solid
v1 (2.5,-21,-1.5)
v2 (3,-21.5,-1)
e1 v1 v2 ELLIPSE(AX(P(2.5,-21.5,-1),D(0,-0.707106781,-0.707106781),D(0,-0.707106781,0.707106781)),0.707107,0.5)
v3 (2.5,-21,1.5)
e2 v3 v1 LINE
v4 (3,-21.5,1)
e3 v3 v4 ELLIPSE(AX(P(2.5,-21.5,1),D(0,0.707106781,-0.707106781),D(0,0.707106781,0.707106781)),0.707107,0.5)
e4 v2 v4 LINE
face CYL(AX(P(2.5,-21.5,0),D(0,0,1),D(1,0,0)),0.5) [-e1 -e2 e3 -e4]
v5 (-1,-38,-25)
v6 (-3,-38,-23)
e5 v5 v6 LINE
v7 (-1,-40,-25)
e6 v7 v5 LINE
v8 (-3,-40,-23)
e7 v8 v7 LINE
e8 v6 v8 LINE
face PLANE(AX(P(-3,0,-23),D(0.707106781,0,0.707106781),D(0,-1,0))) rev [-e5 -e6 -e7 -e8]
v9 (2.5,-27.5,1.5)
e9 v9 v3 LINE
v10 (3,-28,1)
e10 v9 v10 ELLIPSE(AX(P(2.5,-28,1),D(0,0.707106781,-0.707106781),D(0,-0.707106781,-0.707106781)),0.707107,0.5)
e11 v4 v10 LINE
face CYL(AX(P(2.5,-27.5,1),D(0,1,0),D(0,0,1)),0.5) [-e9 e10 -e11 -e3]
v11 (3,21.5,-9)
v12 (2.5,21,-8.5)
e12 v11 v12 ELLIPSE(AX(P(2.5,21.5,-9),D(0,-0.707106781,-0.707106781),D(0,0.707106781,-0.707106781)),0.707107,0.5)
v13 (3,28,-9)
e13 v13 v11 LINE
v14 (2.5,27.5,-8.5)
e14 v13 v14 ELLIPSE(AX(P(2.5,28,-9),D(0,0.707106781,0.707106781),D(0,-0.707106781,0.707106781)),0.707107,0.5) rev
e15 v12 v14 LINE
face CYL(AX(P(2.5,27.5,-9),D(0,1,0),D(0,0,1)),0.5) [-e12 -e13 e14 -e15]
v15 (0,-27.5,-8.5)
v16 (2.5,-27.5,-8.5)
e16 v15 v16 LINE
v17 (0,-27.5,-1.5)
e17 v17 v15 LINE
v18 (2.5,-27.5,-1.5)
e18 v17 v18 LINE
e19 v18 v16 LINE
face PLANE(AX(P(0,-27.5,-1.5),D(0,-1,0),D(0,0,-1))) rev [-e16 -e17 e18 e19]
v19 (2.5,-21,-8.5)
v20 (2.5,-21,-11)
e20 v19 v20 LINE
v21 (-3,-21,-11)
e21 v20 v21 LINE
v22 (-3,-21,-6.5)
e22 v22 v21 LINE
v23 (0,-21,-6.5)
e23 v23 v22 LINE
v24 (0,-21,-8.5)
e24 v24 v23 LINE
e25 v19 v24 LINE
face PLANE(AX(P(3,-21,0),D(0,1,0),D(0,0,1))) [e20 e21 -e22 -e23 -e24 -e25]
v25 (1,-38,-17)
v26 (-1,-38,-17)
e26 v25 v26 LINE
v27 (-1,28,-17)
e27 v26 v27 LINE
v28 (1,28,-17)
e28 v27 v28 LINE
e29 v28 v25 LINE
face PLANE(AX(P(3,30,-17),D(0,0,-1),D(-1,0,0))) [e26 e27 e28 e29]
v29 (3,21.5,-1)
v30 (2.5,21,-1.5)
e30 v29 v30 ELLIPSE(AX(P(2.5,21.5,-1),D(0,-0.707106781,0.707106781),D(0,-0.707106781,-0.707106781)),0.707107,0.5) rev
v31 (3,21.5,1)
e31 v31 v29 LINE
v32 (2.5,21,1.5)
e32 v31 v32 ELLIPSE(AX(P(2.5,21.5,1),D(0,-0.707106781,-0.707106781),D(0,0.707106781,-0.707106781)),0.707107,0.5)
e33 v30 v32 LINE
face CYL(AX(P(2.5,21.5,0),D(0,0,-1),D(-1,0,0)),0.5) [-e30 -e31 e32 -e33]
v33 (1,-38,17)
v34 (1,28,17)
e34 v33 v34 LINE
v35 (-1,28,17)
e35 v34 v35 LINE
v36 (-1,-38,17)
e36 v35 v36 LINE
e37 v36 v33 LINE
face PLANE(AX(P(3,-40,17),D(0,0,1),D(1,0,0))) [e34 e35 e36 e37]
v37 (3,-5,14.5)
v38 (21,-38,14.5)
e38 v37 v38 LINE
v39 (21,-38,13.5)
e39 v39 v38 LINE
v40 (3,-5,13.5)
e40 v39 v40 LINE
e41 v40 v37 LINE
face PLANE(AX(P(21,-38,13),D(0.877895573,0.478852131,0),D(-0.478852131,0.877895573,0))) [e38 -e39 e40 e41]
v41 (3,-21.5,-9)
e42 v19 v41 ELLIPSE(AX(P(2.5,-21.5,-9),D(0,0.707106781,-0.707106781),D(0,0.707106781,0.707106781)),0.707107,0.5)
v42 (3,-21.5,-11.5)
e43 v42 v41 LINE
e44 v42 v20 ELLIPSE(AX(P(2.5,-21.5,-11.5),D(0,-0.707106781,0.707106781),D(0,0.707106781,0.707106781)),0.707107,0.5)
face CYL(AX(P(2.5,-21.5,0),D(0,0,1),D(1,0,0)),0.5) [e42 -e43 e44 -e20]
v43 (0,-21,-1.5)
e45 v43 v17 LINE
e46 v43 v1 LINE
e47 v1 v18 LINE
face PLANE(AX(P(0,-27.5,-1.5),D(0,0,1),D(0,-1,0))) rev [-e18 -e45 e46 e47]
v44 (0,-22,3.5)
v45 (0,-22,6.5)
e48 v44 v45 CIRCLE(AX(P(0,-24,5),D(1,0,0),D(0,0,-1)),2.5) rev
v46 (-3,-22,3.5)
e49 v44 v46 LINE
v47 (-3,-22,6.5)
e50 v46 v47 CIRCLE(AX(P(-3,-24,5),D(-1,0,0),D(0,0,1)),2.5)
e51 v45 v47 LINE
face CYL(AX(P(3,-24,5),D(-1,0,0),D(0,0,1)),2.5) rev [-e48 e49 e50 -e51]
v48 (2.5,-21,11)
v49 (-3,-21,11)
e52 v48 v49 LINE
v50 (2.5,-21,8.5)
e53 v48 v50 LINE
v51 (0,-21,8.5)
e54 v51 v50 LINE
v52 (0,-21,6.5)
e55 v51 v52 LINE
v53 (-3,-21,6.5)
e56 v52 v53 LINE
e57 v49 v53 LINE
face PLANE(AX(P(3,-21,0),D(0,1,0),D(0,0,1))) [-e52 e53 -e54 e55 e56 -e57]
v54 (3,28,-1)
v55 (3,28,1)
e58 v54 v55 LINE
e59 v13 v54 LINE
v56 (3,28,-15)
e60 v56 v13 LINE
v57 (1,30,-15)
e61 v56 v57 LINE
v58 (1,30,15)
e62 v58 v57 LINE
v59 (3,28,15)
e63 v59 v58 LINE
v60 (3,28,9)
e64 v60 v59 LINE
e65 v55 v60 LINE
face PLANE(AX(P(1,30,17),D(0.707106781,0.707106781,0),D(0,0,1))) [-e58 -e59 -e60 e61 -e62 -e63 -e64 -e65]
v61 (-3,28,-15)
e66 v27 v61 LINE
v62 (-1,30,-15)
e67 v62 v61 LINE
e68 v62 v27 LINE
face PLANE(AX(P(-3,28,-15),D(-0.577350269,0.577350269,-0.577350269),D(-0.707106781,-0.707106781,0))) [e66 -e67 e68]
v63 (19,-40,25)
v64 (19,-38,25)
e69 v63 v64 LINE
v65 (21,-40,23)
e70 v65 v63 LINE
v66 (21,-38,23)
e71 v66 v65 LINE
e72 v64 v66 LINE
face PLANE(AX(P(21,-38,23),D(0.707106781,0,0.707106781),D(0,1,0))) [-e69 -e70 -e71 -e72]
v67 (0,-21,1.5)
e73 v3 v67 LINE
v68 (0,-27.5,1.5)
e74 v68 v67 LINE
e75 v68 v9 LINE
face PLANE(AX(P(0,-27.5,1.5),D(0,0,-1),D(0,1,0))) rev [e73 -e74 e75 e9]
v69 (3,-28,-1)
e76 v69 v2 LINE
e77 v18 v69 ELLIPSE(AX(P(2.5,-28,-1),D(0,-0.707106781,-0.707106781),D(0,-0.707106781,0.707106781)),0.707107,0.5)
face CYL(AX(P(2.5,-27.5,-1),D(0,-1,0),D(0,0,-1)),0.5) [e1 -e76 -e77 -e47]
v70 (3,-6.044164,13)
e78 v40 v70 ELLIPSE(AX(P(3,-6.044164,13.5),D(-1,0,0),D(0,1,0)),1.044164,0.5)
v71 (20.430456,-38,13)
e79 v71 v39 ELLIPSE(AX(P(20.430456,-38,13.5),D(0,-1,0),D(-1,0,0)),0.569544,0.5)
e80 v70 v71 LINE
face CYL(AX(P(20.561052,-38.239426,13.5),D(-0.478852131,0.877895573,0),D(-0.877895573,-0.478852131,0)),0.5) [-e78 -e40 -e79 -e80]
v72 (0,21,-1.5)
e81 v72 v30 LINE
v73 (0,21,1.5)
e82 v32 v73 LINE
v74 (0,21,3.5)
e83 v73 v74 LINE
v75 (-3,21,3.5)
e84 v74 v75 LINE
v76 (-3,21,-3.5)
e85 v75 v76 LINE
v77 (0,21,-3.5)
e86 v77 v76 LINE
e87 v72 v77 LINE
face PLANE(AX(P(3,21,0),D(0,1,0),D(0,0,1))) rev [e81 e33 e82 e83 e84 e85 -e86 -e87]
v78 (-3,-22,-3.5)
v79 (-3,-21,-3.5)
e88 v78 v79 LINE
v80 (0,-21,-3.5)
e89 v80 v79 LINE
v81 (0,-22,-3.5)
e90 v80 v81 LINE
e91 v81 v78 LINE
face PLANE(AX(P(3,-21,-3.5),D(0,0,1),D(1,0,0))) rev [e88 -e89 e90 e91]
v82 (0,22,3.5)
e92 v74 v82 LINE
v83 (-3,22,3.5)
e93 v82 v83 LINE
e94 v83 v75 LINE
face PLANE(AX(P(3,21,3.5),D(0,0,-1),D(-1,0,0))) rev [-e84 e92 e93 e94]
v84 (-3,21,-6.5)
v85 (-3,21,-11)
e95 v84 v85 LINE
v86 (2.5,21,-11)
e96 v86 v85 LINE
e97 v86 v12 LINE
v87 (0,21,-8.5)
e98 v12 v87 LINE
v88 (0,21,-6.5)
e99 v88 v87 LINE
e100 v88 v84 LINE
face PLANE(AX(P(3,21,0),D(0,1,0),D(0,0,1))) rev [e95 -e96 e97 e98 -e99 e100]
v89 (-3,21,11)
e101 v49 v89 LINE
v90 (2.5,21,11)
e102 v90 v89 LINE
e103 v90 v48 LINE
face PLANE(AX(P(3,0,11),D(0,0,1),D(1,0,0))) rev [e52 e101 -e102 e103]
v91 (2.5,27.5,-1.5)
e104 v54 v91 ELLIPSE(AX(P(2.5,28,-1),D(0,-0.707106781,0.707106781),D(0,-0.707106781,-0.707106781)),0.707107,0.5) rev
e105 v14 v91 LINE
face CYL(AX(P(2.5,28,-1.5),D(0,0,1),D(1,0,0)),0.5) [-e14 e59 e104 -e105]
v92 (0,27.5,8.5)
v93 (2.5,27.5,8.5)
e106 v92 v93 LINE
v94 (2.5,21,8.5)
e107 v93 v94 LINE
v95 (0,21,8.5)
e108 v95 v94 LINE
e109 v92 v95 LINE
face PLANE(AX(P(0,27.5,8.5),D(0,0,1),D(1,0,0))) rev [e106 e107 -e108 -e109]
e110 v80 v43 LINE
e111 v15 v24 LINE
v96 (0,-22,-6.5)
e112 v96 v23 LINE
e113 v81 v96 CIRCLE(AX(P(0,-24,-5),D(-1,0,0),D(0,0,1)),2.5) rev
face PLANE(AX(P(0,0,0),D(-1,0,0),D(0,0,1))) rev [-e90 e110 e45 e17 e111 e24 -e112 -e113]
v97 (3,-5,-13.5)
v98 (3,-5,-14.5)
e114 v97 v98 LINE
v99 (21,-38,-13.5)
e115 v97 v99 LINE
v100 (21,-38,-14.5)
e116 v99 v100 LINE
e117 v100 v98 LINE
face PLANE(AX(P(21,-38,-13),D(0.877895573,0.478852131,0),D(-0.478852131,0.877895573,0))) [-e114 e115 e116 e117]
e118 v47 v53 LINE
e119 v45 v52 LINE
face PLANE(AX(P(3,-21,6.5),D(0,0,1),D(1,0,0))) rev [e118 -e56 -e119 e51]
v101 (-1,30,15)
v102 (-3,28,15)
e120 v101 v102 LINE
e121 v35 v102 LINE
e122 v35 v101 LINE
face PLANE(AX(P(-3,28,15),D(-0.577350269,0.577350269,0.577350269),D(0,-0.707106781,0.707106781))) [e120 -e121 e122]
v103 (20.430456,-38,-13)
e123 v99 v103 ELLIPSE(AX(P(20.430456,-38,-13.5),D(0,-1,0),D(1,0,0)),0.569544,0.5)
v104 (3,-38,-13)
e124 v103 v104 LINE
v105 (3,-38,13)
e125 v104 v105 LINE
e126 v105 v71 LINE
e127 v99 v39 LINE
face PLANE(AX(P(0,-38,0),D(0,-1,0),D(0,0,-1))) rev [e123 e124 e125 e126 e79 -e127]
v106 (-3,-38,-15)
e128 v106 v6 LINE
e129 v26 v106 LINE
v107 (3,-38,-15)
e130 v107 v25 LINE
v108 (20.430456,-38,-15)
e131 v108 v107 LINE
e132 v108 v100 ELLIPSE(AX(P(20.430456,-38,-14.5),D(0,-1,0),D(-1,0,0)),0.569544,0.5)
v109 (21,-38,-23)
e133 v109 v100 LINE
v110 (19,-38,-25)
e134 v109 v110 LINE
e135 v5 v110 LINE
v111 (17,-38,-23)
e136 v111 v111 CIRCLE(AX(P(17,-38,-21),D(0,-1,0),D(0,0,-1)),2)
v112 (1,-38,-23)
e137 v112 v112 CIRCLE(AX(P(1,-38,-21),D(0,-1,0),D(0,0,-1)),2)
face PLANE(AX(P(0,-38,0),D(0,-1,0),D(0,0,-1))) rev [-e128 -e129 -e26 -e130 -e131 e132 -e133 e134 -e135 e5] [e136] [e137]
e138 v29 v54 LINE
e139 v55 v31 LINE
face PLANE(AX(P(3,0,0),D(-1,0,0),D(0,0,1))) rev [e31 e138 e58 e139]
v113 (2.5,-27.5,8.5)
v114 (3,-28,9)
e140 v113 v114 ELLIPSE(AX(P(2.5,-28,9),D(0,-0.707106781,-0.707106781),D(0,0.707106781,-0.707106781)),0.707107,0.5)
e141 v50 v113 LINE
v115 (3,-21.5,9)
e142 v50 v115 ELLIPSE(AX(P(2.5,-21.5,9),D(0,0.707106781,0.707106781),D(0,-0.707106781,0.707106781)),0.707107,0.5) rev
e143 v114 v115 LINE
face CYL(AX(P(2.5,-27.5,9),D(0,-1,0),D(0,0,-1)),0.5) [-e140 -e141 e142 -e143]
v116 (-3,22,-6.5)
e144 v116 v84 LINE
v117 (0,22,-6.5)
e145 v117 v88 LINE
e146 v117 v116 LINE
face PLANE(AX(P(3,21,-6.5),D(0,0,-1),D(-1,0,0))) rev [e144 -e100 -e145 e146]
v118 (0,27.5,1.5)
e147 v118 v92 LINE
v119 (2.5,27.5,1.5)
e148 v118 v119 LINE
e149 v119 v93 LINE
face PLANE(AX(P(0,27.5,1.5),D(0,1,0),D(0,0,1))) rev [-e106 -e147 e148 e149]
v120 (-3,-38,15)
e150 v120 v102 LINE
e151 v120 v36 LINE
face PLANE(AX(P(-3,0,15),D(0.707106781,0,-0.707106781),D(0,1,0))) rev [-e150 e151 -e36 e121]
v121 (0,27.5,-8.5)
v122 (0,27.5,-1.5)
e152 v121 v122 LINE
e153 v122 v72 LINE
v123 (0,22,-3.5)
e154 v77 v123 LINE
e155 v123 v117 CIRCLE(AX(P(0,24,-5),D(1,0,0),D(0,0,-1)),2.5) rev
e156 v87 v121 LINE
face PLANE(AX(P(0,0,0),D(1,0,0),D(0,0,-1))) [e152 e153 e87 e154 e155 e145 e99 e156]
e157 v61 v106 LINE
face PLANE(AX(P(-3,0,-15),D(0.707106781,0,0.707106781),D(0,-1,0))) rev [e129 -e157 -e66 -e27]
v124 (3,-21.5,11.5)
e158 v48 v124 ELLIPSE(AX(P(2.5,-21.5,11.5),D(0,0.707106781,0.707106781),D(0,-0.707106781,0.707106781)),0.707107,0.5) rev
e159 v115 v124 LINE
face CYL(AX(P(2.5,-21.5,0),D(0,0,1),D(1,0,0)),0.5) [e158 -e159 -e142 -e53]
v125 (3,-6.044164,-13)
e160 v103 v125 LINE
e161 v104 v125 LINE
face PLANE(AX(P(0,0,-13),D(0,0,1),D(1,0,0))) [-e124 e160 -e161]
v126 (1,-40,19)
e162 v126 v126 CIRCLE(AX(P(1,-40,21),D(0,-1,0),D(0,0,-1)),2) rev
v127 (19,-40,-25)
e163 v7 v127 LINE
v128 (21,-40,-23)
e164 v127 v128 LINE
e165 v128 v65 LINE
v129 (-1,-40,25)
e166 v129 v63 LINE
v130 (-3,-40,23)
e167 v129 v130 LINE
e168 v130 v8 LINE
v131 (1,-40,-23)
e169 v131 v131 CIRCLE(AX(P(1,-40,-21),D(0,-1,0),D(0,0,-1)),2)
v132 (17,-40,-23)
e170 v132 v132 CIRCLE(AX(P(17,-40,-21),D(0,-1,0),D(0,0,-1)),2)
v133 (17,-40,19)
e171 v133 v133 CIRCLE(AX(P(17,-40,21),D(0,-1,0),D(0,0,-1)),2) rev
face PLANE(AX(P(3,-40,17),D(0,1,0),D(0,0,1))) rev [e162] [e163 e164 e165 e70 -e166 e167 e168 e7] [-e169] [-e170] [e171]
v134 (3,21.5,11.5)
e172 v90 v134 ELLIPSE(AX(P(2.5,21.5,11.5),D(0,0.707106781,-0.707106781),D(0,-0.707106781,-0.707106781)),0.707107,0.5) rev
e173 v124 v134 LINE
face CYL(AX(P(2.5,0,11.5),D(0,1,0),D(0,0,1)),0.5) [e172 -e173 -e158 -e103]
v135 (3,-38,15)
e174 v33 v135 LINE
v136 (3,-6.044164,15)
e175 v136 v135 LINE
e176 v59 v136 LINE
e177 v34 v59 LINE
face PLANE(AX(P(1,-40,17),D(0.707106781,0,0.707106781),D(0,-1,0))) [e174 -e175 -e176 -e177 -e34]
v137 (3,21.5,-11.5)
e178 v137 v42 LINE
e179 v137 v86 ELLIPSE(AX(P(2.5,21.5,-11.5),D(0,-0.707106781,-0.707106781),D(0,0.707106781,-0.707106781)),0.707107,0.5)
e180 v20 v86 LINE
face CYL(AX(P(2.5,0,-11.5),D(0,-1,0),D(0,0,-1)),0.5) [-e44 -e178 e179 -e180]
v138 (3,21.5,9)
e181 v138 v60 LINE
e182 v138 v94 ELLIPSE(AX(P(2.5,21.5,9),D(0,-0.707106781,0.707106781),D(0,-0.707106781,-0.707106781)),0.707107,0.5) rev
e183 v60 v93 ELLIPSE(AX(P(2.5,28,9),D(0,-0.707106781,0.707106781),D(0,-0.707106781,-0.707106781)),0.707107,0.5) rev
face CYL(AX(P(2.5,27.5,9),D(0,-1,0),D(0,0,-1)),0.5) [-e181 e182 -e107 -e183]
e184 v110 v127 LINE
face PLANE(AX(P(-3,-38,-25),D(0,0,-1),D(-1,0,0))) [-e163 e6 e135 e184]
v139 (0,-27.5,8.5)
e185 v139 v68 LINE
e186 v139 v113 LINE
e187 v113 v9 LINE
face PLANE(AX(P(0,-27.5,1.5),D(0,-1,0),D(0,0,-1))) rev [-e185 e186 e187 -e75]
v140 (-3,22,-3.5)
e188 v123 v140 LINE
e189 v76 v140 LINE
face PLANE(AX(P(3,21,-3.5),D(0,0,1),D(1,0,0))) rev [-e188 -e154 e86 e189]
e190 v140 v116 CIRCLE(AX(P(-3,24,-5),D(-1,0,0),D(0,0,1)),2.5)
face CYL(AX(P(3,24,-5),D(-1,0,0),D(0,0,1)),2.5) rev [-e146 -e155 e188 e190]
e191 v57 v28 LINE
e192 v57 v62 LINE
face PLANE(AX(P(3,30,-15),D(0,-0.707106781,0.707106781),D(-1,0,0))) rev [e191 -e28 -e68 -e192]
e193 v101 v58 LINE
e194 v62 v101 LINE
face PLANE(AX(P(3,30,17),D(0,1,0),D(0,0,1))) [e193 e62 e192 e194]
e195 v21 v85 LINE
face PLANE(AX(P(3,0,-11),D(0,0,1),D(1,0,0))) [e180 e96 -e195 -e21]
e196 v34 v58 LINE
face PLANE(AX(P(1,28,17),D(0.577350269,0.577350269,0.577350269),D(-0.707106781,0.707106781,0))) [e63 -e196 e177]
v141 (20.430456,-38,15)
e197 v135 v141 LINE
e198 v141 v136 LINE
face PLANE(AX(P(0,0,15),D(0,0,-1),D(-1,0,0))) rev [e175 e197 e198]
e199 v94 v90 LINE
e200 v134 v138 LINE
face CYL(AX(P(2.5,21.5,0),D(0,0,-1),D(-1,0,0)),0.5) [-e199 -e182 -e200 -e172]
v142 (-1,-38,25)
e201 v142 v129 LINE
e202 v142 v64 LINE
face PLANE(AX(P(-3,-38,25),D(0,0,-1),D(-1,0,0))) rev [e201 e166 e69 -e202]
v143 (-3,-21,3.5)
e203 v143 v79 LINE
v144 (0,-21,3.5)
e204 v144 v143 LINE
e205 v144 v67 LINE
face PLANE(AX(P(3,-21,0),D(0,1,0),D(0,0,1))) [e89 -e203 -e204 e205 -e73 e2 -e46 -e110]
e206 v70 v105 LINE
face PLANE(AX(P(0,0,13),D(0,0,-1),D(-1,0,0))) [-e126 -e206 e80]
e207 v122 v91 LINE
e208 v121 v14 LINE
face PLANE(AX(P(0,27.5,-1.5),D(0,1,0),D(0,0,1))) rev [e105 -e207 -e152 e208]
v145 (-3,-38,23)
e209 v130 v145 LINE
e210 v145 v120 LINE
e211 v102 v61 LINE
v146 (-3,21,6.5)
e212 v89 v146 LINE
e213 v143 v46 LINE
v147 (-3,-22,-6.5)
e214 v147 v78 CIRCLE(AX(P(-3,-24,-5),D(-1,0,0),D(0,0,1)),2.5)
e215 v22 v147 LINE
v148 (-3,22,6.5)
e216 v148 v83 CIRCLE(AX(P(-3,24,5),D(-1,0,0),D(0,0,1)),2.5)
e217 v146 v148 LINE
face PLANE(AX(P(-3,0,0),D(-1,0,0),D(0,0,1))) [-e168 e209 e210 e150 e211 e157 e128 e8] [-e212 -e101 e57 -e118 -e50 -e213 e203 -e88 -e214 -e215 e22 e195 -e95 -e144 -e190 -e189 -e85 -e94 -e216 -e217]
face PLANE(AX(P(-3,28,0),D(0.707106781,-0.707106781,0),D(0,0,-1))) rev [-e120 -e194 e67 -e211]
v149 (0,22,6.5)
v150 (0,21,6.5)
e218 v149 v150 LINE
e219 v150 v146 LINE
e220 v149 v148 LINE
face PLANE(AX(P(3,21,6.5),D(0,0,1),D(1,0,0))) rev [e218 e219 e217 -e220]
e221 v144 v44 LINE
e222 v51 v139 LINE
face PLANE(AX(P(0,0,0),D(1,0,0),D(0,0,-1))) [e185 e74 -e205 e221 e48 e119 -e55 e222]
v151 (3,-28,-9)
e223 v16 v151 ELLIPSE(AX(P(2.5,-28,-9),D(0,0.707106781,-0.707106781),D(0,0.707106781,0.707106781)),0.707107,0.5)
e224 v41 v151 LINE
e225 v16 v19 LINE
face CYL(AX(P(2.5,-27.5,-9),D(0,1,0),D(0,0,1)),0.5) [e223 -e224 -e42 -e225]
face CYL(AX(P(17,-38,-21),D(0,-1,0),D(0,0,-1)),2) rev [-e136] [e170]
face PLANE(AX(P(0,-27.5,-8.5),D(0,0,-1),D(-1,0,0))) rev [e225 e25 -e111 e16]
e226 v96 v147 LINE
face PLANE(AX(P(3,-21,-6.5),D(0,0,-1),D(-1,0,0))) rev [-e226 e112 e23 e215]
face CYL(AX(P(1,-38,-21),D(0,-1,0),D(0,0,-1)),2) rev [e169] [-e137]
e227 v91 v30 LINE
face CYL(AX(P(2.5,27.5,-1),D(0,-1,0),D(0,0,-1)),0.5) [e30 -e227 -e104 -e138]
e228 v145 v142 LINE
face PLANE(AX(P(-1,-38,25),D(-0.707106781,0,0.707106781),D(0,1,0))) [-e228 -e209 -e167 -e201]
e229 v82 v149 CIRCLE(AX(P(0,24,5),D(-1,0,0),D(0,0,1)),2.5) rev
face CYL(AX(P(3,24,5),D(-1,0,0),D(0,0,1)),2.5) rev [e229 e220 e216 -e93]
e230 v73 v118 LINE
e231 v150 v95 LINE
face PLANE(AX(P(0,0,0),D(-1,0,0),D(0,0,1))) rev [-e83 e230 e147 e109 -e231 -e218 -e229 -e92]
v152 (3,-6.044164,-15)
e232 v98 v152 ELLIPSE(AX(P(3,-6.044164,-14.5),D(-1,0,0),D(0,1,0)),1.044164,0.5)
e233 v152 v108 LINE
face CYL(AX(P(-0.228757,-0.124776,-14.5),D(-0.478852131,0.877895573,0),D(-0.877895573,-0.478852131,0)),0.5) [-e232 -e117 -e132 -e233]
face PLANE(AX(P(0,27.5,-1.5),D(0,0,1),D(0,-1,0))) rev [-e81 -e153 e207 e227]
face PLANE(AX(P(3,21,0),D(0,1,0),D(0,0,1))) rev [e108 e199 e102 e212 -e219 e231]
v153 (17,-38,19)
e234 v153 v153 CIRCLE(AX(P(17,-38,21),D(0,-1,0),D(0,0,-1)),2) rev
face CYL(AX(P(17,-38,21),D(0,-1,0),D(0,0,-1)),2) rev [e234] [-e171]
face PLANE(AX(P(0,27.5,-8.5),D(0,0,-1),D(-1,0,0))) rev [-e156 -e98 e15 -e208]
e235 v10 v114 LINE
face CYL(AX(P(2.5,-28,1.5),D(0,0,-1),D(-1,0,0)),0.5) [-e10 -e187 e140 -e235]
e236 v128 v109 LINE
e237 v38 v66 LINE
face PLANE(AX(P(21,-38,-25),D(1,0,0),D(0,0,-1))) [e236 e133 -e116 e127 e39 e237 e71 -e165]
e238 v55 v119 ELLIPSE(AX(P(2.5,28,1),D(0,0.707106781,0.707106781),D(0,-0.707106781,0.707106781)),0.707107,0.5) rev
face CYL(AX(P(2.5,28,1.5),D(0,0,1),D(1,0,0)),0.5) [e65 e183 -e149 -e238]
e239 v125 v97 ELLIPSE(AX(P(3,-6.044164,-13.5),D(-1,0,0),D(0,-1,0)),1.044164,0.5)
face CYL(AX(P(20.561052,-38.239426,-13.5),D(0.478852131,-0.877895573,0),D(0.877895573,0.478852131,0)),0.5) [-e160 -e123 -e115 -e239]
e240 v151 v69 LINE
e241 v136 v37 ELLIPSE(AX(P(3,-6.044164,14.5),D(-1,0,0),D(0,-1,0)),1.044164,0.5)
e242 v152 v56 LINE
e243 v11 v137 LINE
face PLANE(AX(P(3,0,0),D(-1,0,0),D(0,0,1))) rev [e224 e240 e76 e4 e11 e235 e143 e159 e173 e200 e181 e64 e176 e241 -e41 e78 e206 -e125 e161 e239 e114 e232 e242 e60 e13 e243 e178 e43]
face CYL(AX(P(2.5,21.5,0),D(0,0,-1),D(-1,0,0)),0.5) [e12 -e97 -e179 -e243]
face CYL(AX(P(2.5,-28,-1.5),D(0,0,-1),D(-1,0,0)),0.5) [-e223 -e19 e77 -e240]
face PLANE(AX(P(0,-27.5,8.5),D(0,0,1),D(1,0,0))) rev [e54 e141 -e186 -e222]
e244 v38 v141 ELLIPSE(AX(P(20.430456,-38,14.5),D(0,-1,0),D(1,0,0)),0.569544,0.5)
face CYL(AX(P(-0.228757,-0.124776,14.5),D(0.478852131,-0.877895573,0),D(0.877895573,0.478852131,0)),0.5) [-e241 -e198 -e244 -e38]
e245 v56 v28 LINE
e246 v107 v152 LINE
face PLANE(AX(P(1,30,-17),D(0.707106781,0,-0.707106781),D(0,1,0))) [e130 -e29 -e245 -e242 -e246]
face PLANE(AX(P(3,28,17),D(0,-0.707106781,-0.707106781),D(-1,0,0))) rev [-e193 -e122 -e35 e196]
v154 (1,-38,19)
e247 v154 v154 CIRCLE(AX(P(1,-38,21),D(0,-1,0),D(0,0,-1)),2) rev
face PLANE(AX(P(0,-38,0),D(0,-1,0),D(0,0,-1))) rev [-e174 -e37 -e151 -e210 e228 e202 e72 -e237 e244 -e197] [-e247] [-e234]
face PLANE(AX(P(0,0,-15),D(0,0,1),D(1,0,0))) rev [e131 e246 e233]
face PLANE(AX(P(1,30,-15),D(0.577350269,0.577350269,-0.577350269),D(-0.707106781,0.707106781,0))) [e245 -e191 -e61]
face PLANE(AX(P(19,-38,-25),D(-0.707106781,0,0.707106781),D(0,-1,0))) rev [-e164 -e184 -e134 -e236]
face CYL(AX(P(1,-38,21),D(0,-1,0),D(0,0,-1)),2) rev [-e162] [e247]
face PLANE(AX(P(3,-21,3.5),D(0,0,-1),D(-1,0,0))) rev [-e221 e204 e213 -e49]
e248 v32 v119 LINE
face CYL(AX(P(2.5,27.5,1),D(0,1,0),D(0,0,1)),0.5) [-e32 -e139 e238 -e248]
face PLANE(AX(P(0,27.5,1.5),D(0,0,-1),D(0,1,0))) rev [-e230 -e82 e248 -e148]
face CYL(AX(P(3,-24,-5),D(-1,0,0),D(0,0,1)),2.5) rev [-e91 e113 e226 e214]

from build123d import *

# Parameters (mm, degrees)
SKETCH1_W           = 34
SKETCH1_H           = 70
SKETCH1_W_2         = 22
SKETCH1_H_2         = 42
BOSS_EXTRUDE1_DEPTH = 3
CUT_EXTRUDE1_DEPTH  = 44.874821937
CHAMFER1_SIZE       = 2
SKETCH3_W           = 7
SKETCH3_H           = 7
CUT_EXTRUDE2_DEPTH  = 3
SKETCH4_W           = 24
SKETCH4_H           = 50
SKETCH4_R           = 2
BOSS_EXTRUDE2_DEPTH = 2
CHAMFER2_SIZE       = 2
BOSS_EXTRUDE3_START = -10
BOSS_EXTRUDE3_DEPTH = 2
BOSS_EXTRUDE4_START = -40
BOSS_EXTRUDE4_DEPTH = 2
FILLET1_R           = 0.5


with BuildPart() as part:
    # Sketch1 → Boss-Extrude1 (new, symmetric)
    with BuildSketch(Plane(origin=(0, 0, 0), x_dir=(0, 0, -1), z_dir=(1, 0, 0))):
        with Locations((0, -5)):
            Rectangle(SKETCH1_W, SKETCH1_H)
        Rectangle(SKETCH1_W_2, SKETCH1_H_2, mode=Mode.SUBTRACT)
    extrude(amount=BOSS_EXTRUDE1_DEPTH, both=True)

    # Sketch2 → Cut-Extrude1 (cut, through all)
    with BuildSketch(Plane.ZY.offset(3)):
        with BuildLine():
            Line((-6.5, -21), (-6.5, -22))
            ThreePointArc((-6.5, -22), (-5, -26.5), (-3.5, -22))
            Line((-3.5, -22), (-3.5, -21))
            Line((-3.5, -21), (-6.5, -21))
        make_face()
        with BuildLine():
            Line((3.5, -21), (3.5, -22))
            ThreePointArc((3.5, -22), (5, -26.5), (6.5, -22))
            Line((6.5, -22), (6.5, -21))
            Line((6.5, -21), (3.5, -21))
        make_face()
        with BuildLine():
            Line((6.5, 21), (6.5, 22))
            ThreePointArc((6.5, 22), (5, 26.5), (3.5, 22))
            Line((3.5, 22), (3.5, 21))
            Line((3.5, 21), (6.5, 21))
        make_face()
        with BuildLine():
            Line((-3.5, 21), (-3.5, 22))
            ThreePointArc((-3.5, 22), (-5, 26.5), (-6.5, 22))
            Line((-6.5, 22), (-6.5, 21))
            Line((-6.5, 21), (-3.5, 21))
        make_face()
    extrude(amount=-CUT_EXTRUDE1_DEPTH, mode=Mode.SUBTRACT)

    # Chamfer1
    chamfer1_edges = [part.edges().sort_by_distance(p)[0] for p in [
        (3, -5, 17),
        (3, 30, 0),
        (-3, -5, 17),
        (-3, -5, -17),
        (-3, 30, 0),
        (3, -5, -17),
        (0, 30, 17),
        (0, 30, -17),
    ]]
    chamfer(chamfer1_edges, length=CHAMFER1_SIZE)

    # Sketch3 → Cut-Extrude2 (cut)
    with BuildSketch(Plane(origin=(3, 0, 0), x_dir=(0, 0, -1), z_dir=(1, 0, 0))):
        with Locations((5, 24)):
            Rectangle(SKETCH3_W, SKETCH3_H)
        with Locations((5, -24)):
            Rectangle(SKETCH3_W, SKETCH3_H)
        with Locations((-5, -24)):
            Rectangle(SKETCH3_W, SKETCH3_H)
        with Locations((-5, 24)):
            Rectangle(SKETCH3_W, SKETCH3_H)
    extrude(amount=-CUT_EXTRUDE2_DEPTH, mode=Mode.SUBTRACT)

    # Sketch4 → Boss-Extrude2 (add)
    with BuildSketch(Plane.XZ.offset(40)):
        with Locations((9, 0)):
            Rectangle(SKETCH4_W, SKETCH4_H)
        with Locations(Location((1, -21, 0), (0, 0, 270))):
            Circle(SKETCH4_R, mode=Mode.SUBTRACT)
        with Locations(Location((17, -21, 0), (0, 0, 270))):
            Circle(SKETCH4_R, mode=Mode.SUBTRACT)
        with Locations(Location((17, 21, 0), (0, 0, 270))):
            Circle(SKETCH4_R, mode=Mode.SUBTRACT)
        with Locations(Location((1, 21, 0), (0, 0, 270))):
            Circle(SKETCH4_R, mode=Mode.SUBTRACT)
    extrude(amount=-BOSS_EXTRUDE2_DEPTH)

    # Chamfer2
    chamfer2_edges = [part.edges().sort_by_distance(p)[0] for p in [
        (-3, -39, -25),
        (-3, -39, 25),
        (21, -39, 25),
        (21, -39, -25),
    ]]
    chamfer(chamfer2_edges, length=CHAMFER2_SIZE)

    # Sketch5 → Boss-Extrude3 (add)
    with BuildSketch(Plane(origin=(0, 0, -25), x_dir=(-1, 0, 0), z_dir=(0, 0, -1)).offset(BOSS_EXTRUDE3_START)):
        Polygon((-3, -38), (-21, -38), (-3, -5), align=None)
    extrude(amount=-BOSS_EXTRUDE3_DEPTH)

    # Sketch5<2> → Boss-Extrude4 (add)
    with BuildSketch(Plane(origin=(0, 0, -25), x_dir=(-1, 0, 0), z_dir=(0, 0, -1)).offset(BOSS_EXTRUDE4_START)):
        Polygon((-3, -38), (-21, -38), (-3, -5), align=None)
    extrude(amount=BOSS_EXTRUDE4_DEPTH)

    # Fillet1
    fillet1_edges = [part.edges().sort_by_distance(p)[0] for p in [
        (3, 21, -9.75),
        (3, 24.25, -8.5),
        (3, 27.5, -5),
        (3, 24.25, -1.5),
        (3, -21, -9.75),
        (3, -24.25, -1.5),
        (3, -27.5, -5),
        (3, -24.25, -8.5),
        (3, 21, 9.75),
        (3, 0, 11),
        (3, -21, 9.75),
        (3, -21, 0),
        (3, 0, -11),
        (3, -24.25, 8.5),
        (3, -27.5, 5),
        (3, -24.25, 1.5),
        (3, 21, 0),
        (3, 24.25, 1.5),
        (3, 27.5, 5),
        (3, 24.25, 8.5),
        (12, -21.5, -13),
        (12, -21.5, -15),
        (12, -21.5, 13),
        (12, -21.5, 15),
    ]]
    fillet(fillet1_edges, radius=FILLET1_R - 0.0001)  # a hair under: the kernel refuses the full size


solid = part.part
